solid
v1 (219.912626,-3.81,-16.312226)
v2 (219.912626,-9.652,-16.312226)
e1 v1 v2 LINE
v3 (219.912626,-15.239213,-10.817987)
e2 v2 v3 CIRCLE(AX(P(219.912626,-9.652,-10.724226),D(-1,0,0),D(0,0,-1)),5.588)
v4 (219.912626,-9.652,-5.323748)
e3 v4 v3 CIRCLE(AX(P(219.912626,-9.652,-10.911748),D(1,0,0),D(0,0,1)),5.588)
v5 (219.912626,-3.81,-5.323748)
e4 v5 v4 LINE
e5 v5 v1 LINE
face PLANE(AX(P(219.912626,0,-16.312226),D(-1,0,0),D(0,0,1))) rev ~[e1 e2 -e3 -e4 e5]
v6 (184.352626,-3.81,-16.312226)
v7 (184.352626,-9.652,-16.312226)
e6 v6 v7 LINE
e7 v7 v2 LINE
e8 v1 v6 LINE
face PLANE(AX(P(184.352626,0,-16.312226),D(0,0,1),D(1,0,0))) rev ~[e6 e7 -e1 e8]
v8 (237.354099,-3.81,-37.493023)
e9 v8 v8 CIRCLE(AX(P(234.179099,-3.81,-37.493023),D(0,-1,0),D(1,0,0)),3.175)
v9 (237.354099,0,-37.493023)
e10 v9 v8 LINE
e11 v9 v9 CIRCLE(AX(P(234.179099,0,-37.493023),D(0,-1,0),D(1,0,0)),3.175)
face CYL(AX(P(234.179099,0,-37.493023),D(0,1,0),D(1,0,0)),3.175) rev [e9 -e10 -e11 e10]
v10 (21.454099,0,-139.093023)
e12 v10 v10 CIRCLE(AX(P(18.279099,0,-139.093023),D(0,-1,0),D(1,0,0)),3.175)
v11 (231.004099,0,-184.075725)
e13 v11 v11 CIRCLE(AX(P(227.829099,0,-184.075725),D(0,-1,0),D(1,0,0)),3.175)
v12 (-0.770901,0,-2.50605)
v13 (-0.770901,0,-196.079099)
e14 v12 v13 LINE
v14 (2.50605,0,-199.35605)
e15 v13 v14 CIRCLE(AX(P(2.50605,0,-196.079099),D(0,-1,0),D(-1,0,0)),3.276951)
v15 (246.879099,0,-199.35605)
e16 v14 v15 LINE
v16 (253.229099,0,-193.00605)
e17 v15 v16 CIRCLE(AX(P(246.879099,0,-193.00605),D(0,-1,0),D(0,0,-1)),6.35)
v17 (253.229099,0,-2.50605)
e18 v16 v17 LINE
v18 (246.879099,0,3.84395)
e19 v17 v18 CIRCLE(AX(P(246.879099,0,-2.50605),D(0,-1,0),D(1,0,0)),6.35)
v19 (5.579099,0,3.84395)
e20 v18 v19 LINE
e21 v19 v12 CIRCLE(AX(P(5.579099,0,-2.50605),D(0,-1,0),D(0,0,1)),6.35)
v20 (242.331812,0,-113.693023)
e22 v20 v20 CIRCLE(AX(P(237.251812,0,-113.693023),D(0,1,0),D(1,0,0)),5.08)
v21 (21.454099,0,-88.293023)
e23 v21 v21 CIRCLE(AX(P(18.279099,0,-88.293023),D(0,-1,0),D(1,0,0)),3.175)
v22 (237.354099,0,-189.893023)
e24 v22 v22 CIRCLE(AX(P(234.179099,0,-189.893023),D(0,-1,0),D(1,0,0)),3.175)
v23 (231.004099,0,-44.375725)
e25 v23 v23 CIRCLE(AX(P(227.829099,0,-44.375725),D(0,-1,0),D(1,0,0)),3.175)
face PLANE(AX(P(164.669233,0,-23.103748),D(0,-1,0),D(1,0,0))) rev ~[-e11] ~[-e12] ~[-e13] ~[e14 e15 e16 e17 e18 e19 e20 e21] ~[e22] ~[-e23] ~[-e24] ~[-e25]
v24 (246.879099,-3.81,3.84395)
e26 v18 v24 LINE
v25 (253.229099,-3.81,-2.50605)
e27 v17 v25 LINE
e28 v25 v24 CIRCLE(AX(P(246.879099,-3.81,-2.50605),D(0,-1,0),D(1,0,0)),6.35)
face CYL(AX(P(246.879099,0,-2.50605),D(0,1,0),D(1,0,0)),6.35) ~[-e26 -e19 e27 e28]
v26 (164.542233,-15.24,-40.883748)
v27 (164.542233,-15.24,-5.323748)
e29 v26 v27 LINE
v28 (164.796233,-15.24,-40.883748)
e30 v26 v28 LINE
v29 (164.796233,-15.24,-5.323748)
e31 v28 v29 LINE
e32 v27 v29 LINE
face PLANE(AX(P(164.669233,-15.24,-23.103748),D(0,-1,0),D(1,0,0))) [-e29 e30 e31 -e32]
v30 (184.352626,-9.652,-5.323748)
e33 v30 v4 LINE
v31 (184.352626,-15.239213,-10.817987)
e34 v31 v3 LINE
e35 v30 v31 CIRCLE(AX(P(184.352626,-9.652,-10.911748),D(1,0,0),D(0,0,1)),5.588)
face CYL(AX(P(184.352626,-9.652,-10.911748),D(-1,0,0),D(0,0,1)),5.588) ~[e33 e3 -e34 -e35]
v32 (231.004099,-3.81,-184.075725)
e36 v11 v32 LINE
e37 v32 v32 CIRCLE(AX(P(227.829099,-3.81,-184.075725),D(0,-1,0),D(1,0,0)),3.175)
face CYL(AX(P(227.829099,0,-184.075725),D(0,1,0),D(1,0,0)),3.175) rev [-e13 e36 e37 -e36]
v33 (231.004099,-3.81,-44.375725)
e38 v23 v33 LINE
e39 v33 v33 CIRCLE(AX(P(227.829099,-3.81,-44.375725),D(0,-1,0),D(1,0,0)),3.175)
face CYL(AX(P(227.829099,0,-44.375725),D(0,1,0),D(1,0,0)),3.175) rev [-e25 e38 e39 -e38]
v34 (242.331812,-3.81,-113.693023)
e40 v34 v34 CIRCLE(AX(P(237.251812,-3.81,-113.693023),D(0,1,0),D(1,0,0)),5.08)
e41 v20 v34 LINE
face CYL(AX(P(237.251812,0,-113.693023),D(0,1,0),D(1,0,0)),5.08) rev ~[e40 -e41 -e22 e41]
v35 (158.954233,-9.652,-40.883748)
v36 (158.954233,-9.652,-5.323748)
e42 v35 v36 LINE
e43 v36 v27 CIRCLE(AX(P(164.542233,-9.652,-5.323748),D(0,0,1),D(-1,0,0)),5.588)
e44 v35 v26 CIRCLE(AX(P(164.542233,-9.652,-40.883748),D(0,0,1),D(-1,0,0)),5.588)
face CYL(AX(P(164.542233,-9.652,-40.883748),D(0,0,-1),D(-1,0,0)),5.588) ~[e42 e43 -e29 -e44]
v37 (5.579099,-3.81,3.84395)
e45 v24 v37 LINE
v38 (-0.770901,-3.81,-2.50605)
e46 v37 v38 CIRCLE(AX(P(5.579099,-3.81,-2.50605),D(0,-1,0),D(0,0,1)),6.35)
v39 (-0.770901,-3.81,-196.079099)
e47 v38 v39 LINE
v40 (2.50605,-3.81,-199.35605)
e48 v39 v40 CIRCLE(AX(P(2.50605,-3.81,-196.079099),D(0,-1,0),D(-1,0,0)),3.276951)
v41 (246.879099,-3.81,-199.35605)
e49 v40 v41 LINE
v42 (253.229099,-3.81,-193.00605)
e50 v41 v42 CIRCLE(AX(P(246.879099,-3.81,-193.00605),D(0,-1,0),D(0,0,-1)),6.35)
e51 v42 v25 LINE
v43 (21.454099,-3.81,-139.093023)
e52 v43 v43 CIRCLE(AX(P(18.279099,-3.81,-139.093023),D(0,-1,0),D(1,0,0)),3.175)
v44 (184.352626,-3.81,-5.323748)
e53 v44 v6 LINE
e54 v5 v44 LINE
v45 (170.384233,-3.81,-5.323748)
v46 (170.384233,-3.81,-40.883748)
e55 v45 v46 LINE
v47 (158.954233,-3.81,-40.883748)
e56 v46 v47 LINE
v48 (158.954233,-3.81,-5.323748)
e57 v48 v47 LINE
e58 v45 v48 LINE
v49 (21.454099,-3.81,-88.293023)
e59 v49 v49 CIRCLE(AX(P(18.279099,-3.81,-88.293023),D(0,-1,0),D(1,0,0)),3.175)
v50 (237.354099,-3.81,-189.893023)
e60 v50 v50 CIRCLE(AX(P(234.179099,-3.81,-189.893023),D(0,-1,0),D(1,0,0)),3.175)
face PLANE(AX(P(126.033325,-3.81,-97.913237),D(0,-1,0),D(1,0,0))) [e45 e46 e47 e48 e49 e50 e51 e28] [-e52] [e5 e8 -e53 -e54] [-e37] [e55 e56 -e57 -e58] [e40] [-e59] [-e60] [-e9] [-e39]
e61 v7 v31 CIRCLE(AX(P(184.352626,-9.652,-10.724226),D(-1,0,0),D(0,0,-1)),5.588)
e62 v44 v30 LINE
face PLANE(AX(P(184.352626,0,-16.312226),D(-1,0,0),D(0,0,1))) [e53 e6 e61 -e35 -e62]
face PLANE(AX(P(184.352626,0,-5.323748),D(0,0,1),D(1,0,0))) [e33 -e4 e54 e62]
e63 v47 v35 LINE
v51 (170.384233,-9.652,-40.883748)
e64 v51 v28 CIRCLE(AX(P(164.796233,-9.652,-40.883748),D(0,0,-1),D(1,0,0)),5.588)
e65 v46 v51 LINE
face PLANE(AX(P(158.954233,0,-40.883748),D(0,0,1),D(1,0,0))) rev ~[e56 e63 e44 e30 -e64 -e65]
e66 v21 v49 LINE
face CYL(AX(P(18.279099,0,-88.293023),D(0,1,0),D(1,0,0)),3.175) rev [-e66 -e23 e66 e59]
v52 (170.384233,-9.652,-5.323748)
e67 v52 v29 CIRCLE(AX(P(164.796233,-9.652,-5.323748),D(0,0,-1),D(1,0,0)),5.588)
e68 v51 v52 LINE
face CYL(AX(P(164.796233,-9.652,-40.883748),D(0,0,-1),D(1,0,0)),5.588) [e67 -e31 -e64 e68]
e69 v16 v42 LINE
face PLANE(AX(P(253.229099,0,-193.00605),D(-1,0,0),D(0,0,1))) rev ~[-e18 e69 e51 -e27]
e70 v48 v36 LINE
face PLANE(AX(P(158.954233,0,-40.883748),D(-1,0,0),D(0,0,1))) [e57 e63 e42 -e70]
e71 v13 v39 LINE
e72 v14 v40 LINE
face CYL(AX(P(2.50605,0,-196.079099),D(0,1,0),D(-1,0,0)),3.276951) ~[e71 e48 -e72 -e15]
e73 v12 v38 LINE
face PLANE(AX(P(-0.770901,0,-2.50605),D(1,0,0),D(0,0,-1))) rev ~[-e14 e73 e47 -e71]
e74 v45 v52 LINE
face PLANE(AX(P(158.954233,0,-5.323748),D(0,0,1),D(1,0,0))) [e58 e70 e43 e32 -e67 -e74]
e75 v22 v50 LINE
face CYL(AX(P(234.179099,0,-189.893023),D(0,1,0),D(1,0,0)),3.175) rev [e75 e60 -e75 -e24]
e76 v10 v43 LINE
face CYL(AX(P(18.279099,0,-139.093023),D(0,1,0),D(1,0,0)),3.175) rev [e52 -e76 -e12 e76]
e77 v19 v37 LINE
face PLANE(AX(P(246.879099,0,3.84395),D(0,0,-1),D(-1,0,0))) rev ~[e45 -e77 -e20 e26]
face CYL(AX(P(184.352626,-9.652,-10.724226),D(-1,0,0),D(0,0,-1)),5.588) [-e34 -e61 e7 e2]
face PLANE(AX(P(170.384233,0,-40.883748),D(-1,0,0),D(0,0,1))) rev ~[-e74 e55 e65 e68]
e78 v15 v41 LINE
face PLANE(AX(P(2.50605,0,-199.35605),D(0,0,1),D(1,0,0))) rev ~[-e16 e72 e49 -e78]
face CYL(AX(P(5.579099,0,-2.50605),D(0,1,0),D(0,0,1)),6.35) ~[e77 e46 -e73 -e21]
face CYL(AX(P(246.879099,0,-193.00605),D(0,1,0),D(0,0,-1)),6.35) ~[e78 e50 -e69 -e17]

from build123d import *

# Parameters (mm, degrees)
F0_R        = 3.175
F0_W        = 11.43
F0_H        = 35.56
F0_W_2      = 35.56
F0_H_2      = 10.9884785938
F1_DEPTH    = 3.81
F2_DEPTH    = 15.24
F3_T1_DEPTH = 35.56
F3_T3_DEPTH = 35.56


# Not quite as in the source:
# - a fillet or chamfer that OpenCascade refuses, or shapes differently, is made with other operations: its cross-section is extruded or revolved along the edge and cut away or added


with BuildPart() as f1:
    # F0 (on Front) → F1 (new body)
    with BuildSketch(Plane.XZ):
        with BuildLine():
            Line((246.8790987015, 3.8439502823), (5.5790987015, 3.8439502823))
            ThreePointArc((5.5790987015, 3.8439502823), (1.0889706409, 1.9840783429), (-0.7709012985, -2.5060497177))
            Line((-0.7709012985, -2.5060497177), (-0.7709012985, -196.0790987015))
            ThreePointArc((-0.7709012985, -196.0790987015), (0.1888954325, -198.3962529867), (2.5060497177, -199.3560497177))
            Line((2.5060497177, -199.3560497177), (246.8790987015, -199.3560497177))
            ThreePointArc((246.8790987015, -199.3560497177), (251.369226762, -197.4961777782), (253.2290987015, -193.0060497177))
            Line((253.2290987015, -193.0060497177), (253.2290987015, -2.5060497177))
            ThreePointArc((253.2290987015, -2.5060497177), (251.369226762, 1.9840783429), (246.8790987015, 3.8439502823))
        make_face()
        with Locations((18.2790987015, -139.0930234075)):
            Circle(F0_R, mode=Mode.SUBTRACT)
        with Locations((234.1790987015, -189.8930234075)):
            Circle(F0_R, mode=Mode.SUBTRACT)
        with Locations((227.8290987015, -184.0757250905)):
            Circle(F0_R, mode=Mode.SUBTRACT)
        with BuildLine():
            ThreePointArc((232.1718121719, -113.6930234075), (237.2518121719, -108.6130234075), (242.3318121719, -113.6930234075))
            ThreePointArc((242.3318121719, -113.6930234075), (237.2518121719, -118.7730234075), (232.1718121719, -113.6930234075))
        make_face(mode=Mode.SUBTRACT)
        with Locations((18.2790987015, -88.2930234075)):
            Circle(F0_R, mode=Mode.SUBTRACT)
        with Locations((164.6692329311, -23.1037478608)):
            Rectangle(F0_W, F0_H, mode=Mode.SUBTRACT)
        with Locations((227.8290987015, -44.3757250905)):
            Circle(F0_R, mode=Mode.SUBTRACT)
        with Locations((234.1790987015, -37.4930234075)):
            Circle(F0_R, mode=Mode.SUBTRACT)
        with Locations((202.1326256323, -10.8179871577)):
            Rectangle(F0_W_2, F0_H_2, mode=Mode.SUBTRACT)
        with Locations((164.6692329311, -23.1037478608)):
            Rectangle(F0_W, F0_H)
        with Locations((202.1326256323, -10.8179871577)):
            Rectangle(F0_W_2, F0_H_2)
    extrude(amount=F1_DEPTH)

    # F0 (on Front) → F2 (join)
    with BuildSketch(Plane.XZ):
        with Locations((164.6692329311, -23.1037478608)):
            Rectangle(F0_W, F0_H)
        with Locations((202.1326256323, -10.8179871577)):
            Rectangle(F0_W_2, F0_H_2)
    extrude(amount=F2_DEPTH)

    # F3: fillet of radius 5.588 on 4 edges, made by hand

    # F3_s2 → F3_t1 (cut)
    with BuildSketch(Plane.XY.offset(-40.8837478608)):
        with BuildLine():
            ThreePointArc((158.9542329311, -9.652), (160.5909202379, -13.6033126933), (164.5422329311, -15.24))
            Line((164.5422329311, -15.24), (164.5422329311, -15.35176))
            Line((164.5422329311, -15.35176), (158.8424729311, -15.35176))
            Line((158.8424729311, -15.35176), (158.8424729311, -9.652))
            Line((158.8424729311, -9.652), (158.9542329311, -9.652))
        make_face()
        with BuildLine():
            ThreePointArc((170.3842329311, -9.652), (168.7475456244, -13.6033126933), (164.7962329311, -15.24))
            Line((164.7962329311, -15.24), (164.7962329311, -15.35176))
            Line((164.7962329311, -15.35176), (170.4959929311, -15.35176))
            Line((170.4959929311, -15.35176), (170.4959929311, -9.652))
            Line((170.4959929311, -9.652), (170.3842329311, -9.652))
        make_face()
    extrude(amount=F3_T1_DEPTH, mode=Mode.SUBTRACT)

    # F3_s4 → F3_t3 (cut)
    with BuildSketch(Plane.YZ.offset(184.3526256323)):
        with BuildLine():
            ThreePointArc((-9.652, -5.3237478608), (-13.6033126933, -6.9604351675), (-15.24, -10.9117478608))
            Line((-15.24, -10.9117478608), (-15.35176, -10.9117478608))
            Line((-15.35176, -10.9117478608), (-15.35176, -5.2119878608))
            Line((-15.35176, -5.2119878608), (-9.652, -5.2119878608))
            Line((-9.652, -5.2119878608), (-9.652, -5.3237478608))
        make_face()
        with BuildLine():
            ThreePointArc((-9.652, -16.3122264546), (-13.6033126933, -14.6755391479), (-15.24, -10.7242264546))
            Line((-15.24, -10.7242264546), (-15.35176, -10.7242264546))
            Line((-15.35176, -10.7242264546), (-15.35176, -16.4239864546))
            Line((-15.35176, -16.4239864546), (-9.652, -16.4239864546))
            Line((-9.652, -16.4239864546), (-9.652, -16.3122264546))
        make_face()
    extrude(amount=F3_T3_DEPTH, mode=Mode.SUBTRACT)


solid = f1.part
